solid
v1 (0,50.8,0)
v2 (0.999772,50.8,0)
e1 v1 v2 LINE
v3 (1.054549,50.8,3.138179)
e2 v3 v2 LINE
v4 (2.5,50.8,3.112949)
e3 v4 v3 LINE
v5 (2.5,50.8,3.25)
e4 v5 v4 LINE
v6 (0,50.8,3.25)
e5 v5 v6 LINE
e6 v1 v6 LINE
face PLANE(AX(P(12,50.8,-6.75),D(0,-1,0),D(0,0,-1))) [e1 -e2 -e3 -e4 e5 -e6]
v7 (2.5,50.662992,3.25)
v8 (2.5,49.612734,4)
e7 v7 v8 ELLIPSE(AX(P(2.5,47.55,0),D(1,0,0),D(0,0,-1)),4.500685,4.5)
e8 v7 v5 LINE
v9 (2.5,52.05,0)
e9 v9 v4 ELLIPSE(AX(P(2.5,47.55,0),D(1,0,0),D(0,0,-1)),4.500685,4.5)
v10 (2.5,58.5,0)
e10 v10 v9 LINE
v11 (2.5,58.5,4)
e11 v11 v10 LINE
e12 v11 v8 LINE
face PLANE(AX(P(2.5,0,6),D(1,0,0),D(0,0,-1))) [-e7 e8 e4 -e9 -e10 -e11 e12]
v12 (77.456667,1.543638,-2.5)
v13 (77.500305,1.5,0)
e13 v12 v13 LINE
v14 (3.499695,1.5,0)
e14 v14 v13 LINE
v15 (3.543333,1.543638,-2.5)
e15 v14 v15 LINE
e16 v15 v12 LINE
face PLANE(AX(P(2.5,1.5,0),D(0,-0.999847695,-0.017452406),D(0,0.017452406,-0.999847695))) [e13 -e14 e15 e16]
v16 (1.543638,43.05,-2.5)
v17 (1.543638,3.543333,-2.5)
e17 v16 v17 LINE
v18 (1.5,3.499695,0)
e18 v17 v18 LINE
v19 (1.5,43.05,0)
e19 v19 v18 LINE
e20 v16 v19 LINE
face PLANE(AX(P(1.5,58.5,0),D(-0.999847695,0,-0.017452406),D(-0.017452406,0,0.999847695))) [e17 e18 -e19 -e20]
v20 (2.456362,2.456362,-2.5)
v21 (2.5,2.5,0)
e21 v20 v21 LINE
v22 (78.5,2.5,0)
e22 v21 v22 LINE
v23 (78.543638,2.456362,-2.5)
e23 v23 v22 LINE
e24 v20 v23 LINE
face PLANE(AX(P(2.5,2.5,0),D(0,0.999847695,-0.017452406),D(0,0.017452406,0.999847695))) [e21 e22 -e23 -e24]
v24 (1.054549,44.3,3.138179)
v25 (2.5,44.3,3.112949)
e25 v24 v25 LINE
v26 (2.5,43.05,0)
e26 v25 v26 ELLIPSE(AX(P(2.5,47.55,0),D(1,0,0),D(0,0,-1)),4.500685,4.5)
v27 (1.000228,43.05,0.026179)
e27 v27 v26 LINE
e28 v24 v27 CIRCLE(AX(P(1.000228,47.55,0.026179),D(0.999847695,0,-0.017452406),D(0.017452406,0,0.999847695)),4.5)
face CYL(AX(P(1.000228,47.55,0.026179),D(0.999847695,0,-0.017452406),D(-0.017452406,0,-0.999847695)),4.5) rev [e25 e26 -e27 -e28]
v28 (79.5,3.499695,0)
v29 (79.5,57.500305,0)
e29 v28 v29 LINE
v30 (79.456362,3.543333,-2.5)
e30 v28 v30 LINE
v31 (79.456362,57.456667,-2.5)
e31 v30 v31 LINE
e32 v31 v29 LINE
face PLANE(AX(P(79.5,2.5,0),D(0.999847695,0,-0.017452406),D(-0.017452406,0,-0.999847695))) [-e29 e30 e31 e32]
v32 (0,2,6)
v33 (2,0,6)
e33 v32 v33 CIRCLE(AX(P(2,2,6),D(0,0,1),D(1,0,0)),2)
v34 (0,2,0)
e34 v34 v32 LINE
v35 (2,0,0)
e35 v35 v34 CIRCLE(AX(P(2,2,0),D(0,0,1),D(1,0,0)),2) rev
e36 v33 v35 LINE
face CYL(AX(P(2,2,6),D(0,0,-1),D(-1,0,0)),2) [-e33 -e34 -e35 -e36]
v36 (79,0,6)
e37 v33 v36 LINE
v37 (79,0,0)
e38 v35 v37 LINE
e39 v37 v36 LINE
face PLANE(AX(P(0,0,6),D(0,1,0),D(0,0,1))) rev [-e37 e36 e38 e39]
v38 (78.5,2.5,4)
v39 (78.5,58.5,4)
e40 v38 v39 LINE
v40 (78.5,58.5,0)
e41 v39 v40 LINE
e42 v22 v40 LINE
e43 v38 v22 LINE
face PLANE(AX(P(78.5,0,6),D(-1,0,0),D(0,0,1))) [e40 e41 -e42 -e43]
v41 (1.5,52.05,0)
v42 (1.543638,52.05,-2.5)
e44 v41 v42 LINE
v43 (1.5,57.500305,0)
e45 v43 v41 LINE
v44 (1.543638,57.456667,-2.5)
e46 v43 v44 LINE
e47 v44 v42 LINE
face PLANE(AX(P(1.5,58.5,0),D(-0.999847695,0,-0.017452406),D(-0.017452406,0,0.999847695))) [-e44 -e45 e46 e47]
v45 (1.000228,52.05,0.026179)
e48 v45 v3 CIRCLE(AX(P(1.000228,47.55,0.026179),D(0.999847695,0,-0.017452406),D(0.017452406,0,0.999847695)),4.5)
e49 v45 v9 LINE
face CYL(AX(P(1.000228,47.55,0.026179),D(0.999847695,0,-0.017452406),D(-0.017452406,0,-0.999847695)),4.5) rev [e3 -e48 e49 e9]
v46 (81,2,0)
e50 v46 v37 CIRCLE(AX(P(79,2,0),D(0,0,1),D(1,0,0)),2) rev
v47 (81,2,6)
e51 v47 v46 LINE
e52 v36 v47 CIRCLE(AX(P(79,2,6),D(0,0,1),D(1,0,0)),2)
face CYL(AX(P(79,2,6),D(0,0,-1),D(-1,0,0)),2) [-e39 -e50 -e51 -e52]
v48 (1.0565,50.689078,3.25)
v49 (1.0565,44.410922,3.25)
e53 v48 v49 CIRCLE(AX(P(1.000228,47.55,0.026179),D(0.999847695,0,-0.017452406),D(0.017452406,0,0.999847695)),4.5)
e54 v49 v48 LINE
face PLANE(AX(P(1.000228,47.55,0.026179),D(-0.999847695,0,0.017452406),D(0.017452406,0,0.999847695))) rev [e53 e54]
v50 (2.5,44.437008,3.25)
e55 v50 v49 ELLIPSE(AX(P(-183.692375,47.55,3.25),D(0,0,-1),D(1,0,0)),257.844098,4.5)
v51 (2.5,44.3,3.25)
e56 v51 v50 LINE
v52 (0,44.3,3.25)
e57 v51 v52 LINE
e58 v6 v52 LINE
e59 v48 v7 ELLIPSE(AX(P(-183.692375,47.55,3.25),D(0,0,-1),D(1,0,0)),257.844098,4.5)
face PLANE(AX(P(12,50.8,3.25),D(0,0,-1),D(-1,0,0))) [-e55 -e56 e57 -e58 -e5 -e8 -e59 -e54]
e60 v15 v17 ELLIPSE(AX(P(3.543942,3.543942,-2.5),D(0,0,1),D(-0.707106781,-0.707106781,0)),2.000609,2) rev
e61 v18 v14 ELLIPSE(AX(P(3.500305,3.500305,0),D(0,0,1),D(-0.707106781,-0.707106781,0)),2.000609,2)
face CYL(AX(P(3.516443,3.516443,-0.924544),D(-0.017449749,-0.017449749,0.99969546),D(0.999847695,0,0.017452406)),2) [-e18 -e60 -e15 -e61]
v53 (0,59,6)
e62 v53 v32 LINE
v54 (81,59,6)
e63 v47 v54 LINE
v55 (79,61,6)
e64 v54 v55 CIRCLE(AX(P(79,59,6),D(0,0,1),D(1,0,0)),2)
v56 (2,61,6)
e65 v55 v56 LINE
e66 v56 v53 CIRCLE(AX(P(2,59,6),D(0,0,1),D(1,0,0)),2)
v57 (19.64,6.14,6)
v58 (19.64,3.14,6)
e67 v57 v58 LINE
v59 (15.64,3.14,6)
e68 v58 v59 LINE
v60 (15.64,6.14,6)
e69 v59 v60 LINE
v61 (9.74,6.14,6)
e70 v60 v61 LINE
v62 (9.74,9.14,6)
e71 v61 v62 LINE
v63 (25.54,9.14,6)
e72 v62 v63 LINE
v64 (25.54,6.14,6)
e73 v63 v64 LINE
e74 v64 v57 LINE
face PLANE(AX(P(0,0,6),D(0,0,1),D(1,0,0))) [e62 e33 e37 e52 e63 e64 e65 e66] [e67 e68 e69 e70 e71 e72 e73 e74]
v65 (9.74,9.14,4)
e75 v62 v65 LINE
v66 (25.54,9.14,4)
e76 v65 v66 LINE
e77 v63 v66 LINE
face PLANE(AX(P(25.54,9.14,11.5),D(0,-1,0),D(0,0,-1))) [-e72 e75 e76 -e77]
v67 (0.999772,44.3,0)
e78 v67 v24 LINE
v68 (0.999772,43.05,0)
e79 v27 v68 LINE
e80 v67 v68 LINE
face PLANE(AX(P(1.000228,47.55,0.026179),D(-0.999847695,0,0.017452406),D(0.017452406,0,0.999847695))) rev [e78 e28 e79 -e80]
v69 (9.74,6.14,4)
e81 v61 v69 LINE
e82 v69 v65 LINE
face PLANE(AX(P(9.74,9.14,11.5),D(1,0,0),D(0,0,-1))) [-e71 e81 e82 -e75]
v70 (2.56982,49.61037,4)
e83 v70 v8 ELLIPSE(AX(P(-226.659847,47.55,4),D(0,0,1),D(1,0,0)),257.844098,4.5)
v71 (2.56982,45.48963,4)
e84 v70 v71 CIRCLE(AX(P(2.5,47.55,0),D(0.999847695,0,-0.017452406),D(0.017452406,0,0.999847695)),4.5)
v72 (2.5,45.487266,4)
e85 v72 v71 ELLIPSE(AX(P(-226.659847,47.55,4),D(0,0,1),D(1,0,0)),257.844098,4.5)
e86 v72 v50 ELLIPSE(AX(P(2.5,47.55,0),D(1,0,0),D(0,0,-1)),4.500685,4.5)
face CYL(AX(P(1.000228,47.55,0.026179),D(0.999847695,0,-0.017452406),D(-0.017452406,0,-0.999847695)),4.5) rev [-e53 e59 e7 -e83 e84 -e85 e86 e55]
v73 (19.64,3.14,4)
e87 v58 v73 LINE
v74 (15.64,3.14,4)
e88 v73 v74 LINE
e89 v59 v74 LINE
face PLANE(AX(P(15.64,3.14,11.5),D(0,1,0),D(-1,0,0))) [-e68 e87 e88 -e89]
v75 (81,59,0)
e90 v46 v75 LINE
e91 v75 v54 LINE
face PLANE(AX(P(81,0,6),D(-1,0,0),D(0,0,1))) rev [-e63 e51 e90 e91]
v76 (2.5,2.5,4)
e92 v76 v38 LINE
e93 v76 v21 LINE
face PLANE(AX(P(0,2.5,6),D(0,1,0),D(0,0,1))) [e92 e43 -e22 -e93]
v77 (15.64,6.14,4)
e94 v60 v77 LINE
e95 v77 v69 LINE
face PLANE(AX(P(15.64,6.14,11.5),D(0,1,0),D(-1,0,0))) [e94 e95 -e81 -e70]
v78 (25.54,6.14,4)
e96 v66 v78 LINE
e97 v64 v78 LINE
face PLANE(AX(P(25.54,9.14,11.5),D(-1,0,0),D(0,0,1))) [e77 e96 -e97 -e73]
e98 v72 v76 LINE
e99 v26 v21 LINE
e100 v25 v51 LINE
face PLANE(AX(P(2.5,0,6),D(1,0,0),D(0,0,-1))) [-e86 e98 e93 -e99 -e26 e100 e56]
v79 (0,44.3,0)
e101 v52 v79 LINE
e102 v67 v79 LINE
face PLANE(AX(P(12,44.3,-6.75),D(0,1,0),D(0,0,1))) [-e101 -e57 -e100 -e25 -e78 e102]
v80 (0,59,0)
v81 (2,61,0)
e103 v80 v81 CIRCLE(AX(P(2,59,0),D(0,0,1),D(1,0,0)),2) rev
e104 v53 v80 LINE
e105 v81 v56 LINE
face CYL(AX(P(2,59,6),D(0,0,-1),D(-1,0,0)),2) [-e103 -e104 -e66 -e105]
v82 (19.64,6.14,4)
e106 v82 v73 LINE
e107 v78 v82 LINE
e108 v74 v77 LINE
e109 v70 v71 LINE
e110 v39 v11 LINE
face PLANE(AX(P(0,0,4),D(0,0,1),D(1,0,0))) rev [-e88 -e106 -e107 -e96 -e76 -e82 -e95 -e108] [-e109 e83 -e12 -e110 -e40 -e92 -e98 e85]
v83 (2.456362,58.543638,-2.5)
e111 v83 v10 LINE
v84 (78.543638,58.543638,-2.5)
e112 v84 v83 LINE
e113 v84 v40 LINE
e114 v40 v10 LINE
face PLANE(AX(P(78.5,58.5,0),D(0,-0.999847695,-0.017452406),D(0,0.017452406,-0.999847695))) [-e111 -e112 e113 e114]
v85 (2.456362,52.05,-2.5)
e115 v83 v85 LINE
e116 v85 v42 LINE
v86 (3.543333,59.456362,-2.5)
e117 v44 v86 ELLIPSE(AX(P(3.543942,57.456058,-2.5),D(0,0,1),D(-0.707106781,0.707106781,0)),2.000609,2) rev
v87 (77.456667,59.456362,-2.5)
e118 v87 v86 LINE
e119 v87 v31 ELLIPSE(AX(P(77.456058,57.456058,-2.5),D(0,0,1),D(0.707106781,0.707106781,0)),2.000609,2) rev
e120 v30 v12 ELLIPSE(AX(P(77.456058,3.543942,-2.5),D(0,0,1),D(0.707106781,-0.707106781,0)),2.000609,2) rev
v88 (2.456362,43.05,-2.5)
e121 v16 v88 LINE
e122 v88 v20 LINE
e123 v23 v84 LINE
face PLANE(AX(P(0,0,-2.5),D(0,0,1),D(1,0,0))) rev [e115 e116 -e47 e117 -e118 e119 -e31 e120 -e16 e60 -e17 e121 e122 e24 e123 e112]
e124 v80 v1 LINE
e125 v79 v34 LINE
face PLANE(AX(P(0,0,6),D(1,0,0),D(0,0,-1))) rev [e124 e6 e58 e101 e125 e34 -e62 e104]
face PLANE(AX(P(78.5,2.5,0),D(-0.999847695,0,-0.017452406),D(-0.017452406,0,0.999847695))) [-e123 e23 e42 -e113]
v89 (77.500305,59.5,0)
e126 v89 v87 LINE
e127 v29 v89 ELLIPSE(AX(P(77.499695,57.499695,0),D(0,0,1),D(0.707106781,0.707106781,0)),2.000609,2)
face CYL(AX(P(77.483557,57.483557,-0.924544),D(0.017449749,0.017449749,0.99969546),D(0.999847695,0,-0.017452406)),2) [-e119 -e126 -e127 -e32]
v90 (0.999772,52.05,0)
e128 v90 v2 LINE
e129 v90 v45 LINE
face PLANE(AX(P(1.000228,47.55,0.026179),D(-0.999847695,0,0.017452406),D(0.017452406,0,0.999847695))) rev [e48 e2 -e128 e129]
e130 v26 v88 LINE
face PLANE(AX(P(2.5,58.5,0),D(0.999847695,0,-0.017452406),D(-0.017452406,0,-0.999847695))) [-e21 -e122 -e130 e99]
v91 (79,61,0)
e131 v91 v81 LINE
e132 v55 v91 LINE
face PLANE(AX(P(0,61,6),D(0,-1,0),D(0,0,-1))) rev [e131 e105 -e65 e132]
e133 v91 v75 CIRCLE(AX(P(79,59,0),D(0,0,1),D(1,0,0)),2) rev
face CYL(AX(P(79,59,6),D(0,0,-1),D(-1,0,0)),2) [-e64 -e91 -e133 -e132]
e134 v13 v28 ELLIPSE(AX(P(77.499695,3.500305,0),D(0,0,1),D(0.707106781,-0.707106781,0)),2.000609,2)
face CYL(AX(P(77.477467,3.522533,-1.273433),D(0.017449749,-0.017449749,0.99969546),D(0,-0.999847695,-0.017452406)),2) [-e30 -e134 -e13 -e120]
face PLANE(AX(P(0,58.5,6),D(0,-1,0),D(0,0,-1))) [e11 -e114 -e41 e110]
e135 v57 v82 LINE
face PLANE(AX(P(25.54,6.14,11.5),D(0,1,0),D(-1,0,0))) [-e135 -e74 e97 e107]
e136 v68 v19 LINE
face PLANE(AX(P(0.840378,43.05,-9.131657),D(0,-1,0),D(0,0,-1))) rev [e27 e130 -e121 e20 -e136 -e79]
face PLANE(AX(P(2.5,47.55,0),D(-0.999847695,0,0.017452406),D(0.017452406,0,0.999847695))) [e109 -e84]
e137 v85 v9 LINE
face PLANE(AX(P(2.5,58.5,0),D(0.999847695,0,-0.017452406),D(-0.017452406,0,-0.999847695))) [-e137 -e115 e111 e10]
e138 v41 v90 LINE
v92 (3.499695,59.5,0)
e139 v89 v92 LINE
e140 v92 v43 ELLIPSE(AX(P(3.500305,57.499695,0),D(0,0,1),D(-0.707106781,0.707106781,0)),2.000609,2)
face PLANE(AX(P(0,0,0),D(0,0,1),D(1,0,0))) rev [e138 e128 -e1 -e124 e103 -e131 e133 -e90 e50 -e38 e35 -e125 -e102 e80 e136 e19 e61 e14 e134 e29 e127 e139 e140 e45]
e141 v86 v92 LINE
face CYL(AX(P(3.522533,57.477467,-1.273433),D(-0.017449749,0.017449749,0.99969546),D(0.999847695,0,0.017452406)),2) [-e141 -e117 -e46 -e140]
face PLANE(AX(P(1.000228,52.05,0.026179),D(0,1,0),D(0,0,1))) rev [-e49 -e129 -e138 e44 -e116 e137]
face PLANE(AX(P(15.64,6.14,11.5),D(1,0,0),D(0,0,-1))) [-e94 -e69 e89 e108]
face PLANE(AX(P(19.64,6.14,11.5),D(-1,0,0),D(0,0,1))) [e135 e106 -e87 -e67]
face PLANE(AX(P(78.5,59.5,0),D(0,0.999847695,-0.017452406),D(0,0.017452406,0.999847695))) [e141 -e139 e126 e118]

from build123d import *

# Parameters (mm, degrees)
ESQUISSE1_W                  = 81
ESQUISSE1_H                  = 61
ESQUISSE1_W_2                = 76
ESQUISSE1_H_2                = 56
EXTRU_MINCE1_DEPTH           = 6
ESQUISSE2_W                  = 78
ESQUISSE2_H                  = 58
ESQUISSE2_W_2                = 76
ESQUISSE2_H_2                = 56
EXTRU_MINCE2_DEPTH           = 6
EXTRU_MINCE2_OTHER_WAY_DEPTH = 2.5
EXTRU_MINCE2_OTHER_WAY_TAPER = 1
ESQUISSE3_W                  = 76
ESQUISSE3_H                  = 56
BOSS_EXTRU_1_DEPTH           = 2
CONG_1_R                     = 2
CONG_2_R                     = 2
ESQUISSE4_W                  = 10
ESQUISSE4_H                  = 6.5
ENL_V_MAT_EXTRU_1_DEPTH      = 12
ENL_V_MAT_EXTRU_2_DEPTH      = 1.5
ENL_V_MAT_EXTRU_3_DEPTH      = 11.5


with BuildPart() as part:
    # Esquisse1 → Extru.-Mince1 (new body)
    with BuildSketch(Plane.XY):
        with Locations((40.5, 30.5)):
            Rectangle(ESQUISSE1_W, ESQUISSE1_H)
        with Locations((40.5, 30.5)):
            Rectangle(ESQUISSE1_W_2, ESQUISSE1_H_2, mode=Mode.SUBTRACT)
    extrude(amount=EXTRU_MINCE1_DEPTH)

    # Esquisse2 → Extru.-Mince2 (add)
    with BuildSketch(Plane.XY):
        with Locations((40.5, 30.5)):
            Rectangle(ESQUISSE2_W, ESQUISSE2_H)
        with Locations((40.5, 30.5)):
            Rectangle(ESQUISSE2_W_2, ESQUISSE2_H_2, mode=Mode.SUBTRACT)
    extrude(amount=EXTRU_MINCE2_DEPTH)

    # Esquisse2 → Extru.-Mince2 other way (add)
    with BuildSketch(Plane.XY):
        with Locations((40.5, 30.5)):
            Rectangle(ESQUISSE2_W, ESQUISSE2_H)
        with Locations((40.5, 30.5)):
            Rectangle(ESQUISSE2_W_2, ESQUISSE2_H_2, mode=Mode.SUBTRACT)
    extrude(amount=-EXTRU_MINCE2_OTHER_WAY_DEPTH, taper=EXTRU_MINCE2_OTHER_WAY_TAPER)

    # Esquisse3 → Boss.-Extru.1 (add)
    with BuildSketch(Plane.XY.offset(6)):
        with Locations((40.5, 30.5)):
            Rectangle(ESQUISSE3_W, ESQUISSE3_H)
    extrude(amount=-BOSS_EXTRU_1_DEPTH)

    # Congé1
    cong_1_edges = [part.edges().sort_by_distance(p)[0] for p in [
        (1.521818831, 59.478181169, -1.25),
        (1.521818831, 1.521818831, -1.25),
        (79.478181169, 1.521818831, -1.25),
        (79.478181169, 59.478181169, -1.25),
    ]]
    fillet(cong_1_edges, radius=CONG_1_R)

    # Congé2
    cong_2_edges = [part.edges().sort_by_distance(p)[0] for p in [
        (81, 61, 3),
        (81, 0, 3),
        (0, 0, 3),
        (0, 61, 3),
    ]]
    fillet(cong_2_edges, radius=CONG_2_R)

    # Esquisse4 → Enlèv. mat.-Extru.1 (cut)
    with BuildSketch(Plane(origin=(0, 0, 0), x_dir=(0, 0, -1), z_dir=(1, 0, 0))):
        with Locations((1.75, 47.55)):
            Rectangle(ESQUISSE4_W, ESQUISSE4_H)
    extrude(amount=ENL_V_MAT_EXTRU_1_DEPTH, mode=Mode.SUBTRACT)

    # Esquisse5 → Enlèv. mat.-Extru.2 (cut)
    with BuildSketch(Plane(origin=(2.499238534, 0, -0.043624371), x_dir=(-0.01745240643728355, 0, -0.9998476951563913), z_dir=(0.9998476951563913, 0, -0.01745240643728355))):
        with BuildLine():
            Line((-0.043631016, 52.05), (9.11559923, 52.05))
            Line((9.11559923, 52.05), (9.11559923, 43.05))
            Line((9.11559923, 43.05), (-0.043631016, 43.05))
            ThreePointArc((-0.043631016, 43.05), (-4.543631016, 47.55), (-0.043631016, 52.05))
        make_face()
    extrude(amount=-ENL_V_MAT_EXTRU_2_DEPTH, mode=Mode.SUBTRACT)

    # Esquisse6 → Enlèv. mat.-Extru.3 (cut)
    with BuildSketch(Plane.XY):
        Polygon((25.54, 9.14), (9.74, 9.14), (9.74, 6.14), (15.64, 6.14), (15.64, 3.14), (19.64, 3.14), (19.64, 6.14), (25.54, 6.14), align=None)
    extrude(amount=ENL_V_MAT_EXTRU_3_DEPTH, mode=Mode.SUBTRACT)


solid = part.part
